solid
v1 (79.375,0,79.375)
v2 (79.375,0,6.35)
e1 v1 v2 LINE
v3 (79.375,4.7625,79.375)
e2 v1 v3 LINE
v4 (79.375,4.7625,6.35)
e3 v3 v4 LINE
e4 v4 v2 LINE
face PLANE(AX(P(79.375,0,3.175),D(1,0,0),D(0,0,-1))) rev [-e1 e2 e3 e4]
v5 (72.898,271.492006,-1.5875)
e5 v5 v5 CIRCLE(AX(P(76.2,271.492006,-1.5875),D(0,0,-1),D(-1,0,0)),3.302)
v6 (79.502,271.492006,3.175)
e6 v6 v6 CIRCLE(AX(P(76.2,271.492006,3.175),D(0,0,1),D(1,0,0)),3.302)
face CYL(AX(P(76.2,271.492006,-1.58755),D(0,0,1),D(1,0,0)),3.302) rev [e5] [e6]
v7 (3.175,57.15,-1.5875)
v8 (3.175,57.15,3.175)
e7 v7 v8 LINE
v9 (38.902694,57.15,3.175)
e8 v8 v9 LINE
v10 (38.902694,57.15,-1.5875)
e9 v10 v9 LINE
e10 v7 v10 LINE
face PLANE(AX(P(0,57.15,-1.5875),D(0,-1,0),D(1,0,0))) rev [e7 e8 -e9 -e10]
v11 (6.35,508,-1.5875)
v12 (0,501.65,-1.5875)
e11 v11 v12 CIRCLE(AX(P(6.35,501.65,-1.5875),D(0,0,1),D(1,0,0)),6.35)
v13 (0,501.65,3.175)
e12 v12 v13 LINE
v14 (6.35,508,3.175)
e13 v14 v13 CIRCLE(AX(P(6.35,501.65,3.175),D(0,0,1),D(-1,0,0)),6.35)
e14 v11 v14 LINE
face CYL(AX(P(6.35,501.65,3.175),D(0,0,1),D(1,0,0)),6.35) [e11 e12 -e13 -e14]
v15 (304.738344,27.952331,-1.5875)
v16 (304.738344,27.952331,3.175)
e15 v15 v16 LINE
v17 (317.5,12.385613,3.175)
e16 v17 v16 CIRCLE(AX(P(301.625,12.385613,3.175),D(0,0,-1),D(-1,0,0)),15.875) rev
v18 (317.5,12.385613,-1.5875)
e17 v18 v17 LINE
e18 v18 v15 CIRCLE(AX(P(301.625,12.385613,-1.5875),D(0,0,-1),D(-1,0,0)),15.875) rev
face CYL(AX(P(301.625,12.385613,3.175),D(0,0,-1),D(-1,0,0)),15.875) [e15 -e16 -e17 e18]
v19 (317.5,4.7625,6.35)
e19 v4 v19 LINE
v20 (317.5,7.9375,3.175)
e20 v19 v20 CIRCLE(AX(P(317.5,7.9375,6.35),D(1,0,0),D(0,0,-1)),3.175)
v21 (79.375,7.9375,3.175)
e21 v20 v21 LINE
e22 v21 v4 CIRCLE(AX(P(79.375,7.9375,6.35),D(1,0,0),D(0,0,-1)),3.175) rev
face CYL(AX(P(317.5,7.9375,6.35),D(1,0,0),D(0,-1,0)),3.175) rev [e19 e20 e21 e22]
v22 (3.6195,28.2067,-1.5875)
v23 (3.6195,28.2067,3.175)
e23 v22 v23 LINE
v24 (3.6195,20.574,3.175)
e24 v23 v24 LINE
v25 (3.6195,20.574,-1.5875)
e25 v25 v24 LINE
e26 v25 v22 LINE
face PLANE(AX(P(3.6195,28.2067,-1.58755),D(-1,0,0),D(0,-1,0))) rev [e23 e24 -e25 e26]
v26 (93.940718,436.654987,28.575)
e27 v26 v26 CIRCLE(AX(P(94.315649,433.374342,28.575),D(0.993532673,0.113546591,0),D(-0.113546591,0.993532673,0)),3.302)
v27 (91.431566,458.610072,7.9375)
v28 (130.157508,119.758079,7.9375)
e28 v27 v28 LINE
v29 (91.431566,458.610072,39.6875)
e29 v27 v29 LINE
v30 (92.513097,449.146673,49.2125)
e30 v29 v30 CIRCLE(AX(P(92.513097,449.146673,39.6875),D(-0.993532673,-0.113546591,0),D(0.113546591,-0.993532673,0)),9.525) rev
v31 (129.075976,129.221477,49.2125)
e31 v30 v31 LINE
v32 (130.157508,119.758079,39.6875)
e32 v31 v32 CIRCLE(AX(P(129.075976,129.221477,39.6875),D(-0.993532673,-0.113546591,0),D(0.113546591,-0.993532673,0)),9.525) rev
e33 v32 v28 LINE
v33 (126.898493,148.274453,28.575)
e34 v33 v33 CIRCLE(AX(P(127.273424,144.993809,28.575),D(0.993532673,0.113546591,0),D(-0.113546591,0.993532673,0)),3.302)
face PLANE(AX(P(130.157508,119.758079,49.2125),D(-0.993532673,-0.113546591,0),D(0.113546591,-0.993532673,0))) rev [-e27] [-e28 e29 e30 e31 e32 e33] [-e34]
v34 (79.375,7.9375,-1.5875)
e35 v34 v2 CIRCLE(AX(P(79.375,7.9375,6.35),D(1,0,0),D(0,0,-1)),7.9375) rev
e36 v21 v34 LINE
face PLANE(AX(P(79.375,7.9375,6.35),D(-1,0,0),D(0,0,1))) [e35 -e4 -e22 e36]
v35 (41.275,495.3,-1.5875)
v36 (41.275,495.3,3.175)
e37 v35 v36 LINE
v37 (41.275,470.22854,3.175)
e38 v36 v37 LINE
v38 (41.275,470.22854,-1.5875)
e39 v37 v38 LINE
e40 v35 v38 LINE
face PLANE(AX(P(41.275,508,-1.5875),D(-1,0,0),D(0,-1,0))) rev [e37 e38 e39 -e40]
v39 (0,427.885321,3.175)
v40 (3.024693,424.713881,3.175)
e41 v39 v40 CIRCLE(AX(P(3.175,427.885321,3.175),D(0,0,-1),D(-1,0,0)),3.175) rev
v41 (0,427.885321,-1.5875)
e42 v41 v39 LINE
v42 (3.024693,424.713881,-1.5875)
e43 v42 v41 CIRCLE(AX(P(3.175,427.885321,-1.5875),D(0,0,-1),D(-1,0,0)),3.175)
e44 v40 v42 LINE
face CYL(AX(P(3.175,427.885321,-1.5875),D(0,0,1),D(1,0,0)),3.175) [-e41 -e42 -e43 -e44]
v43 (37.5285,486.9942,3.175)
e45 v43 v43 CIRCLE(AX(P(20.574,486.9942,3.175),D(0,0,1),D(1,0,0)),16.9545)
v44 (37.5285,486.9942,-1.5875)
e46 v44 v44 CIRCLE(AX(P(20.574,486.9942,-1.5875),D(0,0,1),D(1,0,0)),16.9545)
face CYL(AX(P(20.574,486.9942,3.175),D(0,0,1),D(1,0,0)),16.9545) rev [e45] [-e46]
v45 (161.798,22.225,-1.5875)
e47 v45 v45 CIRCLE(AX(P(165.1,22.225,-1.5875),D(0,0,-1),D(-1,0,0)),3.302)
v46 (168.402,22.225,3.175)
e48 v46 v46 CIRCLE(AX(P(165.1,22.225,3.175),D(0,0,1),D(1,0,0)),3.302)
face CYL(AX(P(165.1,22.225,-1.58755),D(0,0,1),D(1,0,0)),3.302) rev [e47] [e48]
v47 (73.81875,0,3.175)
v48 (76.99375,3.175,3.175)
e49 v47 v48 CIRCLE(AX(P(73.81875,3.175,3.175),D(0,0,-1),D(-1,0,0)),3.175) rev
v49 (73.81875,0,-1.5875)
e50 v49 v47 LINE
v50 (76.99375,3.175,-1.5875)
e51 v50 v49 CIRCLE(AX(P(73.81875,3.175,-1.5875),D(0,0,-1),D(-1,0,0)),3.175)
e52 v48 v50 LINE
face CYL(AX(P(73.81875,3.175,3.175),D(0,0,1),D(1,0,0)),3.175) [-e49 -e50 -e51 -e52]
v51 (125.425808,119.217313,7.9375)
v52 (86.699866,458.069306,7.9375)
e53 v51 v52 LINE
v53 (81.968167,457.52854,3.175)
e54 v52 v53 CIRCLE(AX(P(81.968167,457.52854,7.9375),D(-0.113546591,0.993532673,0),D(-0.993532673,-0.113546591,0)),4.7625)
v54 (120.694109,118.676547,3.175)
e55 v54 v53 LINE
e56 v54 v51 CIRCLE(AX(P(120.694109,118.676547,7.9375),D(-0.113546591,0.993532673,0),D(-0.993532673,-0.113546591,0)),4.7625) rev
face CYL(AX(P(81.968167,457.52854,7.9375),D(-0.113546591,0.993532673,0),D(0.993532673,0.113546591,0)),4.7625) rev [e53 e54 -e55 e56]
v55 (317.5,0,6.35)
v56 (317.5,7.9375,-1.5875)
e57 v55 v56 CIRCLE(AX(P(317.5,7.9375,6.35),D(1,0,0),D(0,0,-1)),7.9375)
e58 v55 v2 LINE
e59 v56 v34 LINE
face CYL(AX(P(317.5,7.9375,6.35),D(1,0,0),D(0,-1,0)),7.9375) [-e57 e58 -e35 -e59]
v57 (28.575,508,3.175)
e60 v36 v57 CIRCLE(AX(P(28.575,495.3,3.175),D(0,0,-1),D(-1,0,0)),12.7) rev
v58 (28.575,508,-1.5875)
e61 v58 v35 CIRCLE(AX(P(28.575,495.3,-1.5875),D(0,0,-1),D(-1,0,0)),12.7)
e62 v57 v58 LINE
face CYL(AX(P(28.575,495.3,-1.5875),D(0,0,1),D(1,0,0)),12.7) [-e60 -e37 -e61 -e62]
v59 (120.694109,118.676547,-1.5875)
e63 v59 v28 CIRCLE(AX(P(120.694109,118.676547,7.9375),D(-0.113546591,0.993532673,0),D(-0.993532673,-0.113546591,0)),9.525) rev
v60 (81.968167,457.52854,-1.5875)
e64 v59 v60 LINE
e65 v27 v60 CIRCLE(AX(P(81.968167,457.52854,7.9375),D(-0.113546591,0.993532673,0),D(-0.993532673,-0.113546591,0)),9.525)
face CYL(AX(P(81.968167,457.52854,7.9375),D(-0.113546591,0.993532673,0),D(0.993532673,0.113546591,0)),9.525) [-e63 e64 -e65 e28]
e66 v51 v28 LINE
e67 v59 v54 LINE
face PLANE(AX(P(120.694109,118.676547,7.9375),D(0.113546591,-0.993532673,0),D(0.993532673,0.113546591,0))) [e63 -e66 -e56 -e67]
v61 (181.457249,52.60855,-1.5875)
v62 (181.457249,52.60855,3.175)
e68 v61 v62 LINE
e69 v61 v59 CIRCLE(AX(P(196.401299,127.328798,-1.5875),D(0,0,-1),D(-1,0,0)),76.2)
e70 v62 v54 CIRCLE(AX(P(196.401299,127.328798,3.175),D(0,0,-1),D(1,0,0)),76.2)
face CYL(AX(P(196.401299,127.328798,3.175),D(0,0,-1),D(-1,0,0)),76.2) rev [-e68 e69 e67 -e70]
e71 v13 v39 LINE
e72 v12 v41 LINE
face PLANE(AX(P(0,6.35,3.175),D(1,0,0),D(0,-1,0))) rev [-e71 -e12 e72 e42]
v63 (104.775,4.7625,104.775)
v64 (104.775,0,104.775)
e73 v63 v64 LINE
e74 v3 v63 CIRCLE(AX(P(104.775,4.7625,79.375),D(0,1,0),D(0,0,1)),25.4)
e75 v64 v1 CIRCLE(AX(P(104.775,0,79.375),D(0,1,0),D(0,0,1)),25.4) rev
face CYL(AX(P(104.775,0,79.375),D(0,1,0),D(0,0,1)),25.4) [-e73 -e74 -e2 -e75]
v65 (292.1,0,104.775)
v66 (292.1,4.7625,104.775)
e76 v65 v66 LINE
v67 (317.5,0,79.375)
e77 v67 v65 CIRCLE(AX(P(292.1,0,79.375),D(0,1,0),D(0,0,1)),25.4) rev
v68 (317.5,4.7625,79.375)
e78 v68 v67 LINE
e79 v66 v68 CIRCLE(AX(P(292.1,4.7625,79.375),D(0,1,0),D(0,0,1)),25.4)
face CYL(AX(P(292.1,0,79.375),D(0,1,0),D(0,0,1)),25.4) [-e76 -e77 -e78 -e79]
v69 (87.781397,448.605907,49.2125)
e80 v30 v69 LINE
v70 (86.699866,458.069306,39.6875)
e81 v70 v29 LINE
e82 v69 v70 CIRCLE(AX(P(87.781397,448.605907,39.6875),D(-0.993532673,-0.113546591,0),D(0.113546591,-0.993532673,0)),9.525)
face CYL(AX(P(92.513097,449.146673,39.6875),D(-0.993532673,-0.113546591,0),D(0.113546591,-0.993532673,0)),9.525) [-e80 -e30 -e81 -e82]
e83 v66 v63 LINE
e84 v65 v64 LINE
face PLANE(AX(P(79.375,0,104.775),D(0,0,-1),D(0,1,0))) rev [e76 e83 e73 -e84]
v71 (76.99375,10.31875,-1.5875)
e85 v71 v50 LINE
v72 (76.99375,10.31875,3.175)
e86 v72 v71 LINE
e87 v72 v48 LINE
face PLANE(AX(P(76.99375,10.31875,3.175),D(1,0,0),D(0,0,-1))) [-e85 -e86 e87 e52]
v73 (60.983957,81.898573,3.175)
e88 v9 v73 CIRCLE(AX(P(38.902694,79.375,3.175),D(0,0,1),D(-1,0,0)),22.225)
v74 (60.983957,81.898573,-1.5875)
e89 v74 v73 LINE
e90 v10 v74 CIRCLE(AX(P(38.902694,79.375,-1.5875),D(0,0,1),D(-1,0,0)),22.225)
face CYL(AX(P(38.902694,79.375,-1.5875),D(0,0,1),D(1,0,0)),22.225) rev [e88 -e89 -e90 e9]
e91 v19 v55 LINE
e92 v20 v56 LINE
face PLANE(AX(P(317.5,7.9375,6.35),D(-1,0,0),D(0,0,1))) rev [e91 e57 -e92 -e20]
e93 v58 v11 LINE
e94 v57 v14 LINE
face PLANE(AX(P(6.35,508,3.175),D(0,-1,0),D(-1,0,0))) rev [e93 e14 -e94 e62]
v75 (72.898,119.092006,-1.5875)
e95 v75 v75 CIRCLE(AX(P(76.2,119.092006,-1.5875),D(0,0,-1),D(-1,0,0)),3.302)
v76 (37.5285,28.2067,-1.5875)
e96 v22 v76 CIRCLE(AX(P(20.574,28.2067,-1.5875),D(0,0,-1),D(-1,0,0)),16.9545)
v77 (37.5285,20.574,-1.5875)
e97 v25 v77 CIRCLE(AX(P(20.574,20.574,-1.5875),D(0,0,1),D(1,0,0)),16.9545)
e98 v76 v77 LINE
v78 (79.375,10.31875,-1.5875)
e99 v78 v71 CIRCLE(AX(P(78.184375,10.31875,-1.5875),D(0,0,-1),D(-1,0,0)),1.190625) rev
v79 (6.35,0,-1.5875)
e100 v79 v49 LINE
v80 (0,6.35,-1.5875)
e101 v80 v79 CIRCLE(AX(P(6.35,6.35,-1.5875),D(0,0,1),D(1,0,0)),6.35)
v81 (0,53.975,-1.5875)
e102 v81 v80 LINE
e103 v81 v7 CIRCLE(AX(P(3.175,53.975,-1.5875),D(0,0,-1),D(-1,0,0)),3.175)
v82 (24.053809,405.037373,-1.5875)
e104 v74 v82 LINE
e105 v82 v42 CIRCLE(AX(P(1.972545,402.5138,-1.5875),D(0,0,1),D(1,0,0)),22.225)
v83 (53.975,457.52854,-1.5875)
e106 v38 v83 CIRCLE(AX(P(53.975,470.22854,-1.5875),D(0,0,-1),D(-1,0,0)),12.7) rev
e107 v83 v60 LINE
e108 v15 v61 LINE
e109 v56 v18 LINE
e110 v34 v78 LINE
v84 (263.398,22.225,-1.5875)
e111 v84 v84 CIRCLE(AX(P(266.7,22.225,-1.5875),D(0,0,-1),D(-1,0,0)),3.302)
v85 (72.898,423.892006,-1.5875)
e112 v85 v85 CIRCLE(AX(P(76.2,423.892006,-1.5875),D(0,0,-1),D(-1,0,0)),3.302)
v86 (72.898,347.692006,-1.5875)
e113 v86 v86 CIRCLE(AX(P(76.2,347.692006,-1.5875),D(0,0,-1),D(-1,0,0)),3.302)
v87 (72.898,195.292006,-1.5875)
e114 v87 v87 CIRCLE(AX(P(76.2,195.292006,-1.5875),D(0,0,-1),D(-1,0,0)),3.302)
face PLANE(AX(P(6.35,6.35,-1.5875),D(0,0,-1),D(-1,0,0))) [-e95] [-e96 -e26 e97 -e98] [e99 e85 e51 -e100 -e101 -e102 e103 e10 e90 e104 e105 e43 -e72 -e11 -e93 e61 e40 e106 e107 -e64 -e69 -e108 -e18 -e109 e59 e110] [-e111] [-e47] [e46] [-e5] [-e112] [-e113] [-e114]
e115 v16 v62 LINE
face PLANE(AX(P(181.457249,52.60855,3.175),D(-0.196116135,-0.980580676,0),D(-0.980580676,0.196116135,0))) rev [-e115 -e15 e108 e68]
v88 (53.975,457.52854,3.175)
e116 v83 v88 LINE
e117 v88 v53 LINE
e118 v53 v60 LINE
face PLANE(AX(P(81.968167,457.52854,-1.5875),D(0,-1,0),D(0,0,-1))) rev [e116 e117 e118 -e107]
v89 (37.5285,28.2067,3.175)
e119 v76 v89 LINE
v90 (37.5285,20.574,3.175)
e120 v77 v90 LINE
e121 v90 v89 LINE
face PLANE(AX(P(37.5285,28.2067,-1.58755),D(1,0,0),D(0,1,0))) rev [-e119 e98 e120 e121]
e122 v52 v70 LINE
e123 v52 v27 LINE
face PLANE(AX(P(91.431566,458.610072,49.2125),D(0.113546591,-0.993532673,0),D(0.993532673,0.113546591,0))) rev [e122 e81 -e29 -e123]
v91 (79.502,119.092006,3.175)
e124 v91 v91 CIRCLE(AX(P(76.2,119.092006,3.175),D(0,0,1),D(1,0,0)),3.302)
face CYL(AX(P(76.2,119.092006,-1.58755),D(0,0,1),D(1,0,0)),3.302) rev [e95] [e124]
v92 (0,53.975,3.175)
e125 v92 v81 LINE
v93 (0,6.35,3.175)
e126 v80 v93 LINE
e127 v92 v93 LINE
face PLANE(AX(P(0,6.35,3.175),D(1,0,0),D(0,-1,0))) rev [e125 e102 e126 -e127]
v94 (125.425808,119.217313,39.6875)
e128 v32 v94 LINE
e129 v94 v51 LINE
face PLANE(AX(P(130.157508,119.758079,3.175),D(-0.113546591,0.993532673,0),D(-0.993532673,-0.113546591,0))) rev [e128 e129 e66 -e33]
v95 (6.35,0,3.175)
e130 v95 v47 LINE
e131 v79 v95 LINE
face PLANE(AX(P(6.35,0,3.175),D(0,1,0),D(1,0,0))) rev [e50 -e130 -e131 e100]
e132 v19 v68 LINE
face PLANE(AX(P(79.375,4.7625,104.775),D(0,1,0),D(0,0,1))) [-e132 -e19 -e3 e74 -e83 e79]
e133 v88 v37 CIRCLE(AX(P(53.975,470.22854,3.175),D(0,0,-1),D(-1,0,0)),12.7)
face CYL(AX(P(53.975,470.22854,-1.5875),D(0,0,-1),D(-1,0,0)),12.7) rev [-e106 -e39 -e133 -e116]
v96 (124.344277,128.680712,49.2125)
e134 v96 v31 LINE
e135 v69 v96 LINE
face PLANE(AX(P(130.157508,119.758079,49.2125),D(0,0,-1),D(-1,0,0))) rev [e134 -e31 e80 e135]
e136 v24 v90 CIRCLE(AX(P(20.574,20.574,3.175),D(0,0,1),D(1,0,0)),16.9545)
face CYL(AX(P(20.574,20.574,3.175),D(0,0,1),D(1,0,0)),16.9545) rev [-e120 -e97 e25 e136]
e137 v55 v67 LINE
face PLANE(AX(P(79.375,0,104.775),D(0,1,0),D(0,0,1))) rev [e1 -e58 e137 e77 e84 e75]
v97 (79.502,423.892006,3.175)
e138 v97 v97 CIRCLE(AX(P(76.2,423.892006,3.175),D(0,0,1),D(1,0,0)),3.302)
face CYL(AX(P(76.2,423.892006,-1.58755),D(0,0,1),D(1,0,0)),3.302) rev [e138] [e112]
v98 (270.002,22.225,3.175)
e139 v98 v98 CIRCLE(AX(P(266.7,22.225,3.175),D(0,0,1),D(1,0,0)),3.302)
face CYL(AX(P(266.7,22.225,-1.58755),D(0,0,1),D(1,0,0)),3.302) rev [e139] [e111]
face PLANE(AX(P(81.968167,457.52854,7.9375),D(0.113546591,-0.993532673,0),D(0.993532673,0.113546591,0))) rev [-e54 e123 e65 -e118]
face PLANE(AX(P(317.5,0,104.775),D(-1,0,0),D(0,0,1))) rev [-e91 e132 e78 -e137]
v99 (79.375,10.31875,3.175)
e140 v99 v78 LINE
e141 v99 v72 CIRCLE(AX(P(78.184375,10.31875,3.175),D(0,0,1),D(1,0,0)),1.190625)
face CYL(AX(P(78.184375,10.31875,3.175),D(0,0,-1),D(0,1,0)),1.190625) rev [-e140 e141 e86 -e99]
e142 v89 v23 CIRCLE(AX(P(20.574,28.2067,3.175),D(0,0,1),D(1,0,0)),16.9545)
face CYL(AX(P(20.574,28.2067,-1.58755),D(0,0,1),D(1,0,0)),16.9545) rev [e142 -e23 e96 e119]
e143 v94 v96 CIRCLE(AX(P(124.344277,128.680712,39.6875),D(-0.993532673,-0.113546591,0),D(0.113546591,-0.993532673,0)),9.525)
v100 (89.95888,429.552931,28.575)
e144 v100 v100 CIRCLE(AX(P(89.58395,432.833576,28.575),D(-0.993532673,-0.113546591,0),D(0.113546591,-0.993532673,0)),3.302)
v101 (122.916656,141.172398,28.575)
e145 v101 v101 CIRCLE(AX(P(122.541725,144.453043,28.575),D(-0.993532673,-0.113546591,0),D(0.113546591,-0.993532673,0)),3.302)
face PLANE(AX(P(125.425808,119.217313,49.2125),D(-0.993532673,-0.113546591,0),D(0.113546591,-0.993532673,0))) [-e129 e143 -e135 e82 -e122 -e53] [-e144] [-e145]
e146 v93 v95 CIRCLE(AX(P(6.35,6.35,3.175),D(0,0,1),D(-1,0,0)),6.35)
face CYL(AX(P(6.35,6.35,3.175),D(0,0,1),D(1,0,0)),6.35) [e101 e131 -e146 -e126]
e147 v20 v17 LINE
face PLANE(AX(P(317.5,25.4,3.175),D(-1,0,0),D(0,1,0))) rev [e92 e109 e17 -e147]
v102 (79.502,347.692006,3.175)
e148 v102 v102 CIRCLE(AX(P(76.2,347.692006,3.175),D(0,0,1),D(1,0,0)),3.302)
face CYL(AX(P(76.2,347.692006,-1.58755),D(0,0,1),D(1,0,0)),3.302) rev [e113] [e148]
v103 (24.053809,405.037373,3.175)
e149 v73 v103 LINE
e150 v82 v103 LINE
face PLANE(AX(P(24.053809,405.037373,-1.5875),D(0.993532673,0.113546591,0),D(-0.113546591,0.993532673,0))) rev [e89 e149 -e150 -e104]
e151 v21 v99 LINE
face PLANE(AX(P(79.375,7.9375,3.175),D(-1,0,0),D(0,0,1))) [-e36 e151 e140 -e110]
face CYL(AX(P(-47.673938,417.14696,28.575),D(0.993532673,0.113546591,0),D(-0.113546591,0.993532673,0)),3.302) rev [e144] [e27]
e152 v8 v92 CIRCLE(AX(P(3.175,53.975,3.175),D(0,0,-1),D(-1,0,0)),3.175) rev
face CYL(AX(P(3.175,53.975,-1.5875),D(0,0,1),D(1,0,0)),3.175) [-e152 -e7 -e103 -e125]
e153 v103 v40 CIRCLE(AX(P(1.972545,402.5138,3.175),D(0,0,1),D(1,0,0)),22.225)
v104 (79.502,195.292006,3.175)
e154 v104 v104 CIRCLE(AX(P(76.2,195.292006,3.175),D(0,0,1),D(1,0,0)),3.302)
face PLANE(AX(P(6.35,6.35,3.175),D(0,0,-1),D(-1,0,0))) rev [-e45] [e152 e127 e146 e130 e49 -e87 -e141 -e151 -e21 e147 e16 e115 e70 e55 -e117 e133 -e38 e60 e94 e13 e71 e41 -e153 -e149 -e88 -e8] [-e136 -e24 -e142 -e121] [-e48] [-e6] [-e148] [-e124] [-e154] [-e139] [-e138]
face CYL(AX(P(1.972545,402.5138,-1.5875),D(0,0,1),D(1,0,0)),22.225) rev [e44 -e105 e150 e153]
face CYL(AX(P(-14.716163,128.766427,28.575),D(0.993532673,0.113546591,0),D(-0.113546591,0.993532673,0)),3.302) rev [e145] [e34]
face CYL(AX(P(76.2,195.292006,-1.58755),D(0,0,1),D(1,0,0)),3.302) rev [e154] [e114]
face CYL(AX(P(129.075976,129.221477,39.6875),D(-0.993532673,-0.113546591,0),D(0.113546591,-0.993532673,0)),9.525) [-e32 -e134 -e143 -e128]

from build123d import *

# Parameters (mm, degrees)
BOSS_EXTRUDE1_DEPTH      = 3.175
SKETCH2_R                = 16.9545
CUT_EXTRUDE1_DEPTH       = 600.06621556
FILLET1_R                = 15.875
CONVERT_SOLID1_START     = -1.5875
CONVERT_SOLID1_OUTLINE_R = 16.9545
CONVERT_SOLID1_DEPTH     = 1.5875
EDGE_FLANGE1_START       = 76.99375
EDGE_FLANGE1_DEPTH       = 240.50625
EDGE_FLANGE1_START_2     = 79.375
EDGE_FLANGE1_2_DEPTH     = 238.125
EDGE_FLANGE1_START_3     = -3
EDGE_FLANGE1_3_DEPTH     = 9.35
FILLET2_R                = 25.4
FILLET3_R                = 3.175
CUT_EXTRUDE2_DEPTH       = 4.7625
FILLET4_R                = 3.175
EDGE_FLANGE3_DEPTH       = 341.057724741
FILLET5_R                = 9.525
CUT_EXTRUDE3_DEPTH       = 4.7625
FILLET7_R                = 12.7
SKETCH17_R               = 3.302
CUT_EXTRUDE4_DEPTH       = 608.612384802
CUT_EXTRUDE5_DEPTH       = 608.612384802
SKETCH19_R               = 3.302
CUT_EXTRUDE6_DEPTH       = 533.561746786


with BuildPart() as part:
    # Sketch1 → Boss-Extrude1 (new body)
    with BuildSketch(Plane.XY):
        with BuildLine():
            Line((6.35, 0), (317.5, 0))
            Line((317.5, 0), (317.5, 25.4))
            Line((317.5, 25.4), (181.457249023, 52.608550195))
            ThreePointArc((181.457249023, 52.608550195), (140.315142877, 75.746018143), (120.694108864, 118.676547437))
            Line((120.694108864, 118.676547437), (76.2, 508))
            Line((76.2, 508), (6.35, 508))
            ThreePointArc((6.35, 508), (1.859871939, 506.140128061), (0, 501.65))
            Line((0, 501.65), (0, 6.35))
            ThreePointArc((0, 6.35), (1.859871939, 1.859871939), (6.35, 0))
        make_face()
    extrude(amount=BOSS_EXTRUDE1_DEPTH)

    # Sketch2 → Cut-Extrude1 (cut, through all)
    with BuildSketch(Plane.XY.offset(3.175)):
        with Locations((20.574, 486.9942)):
            Circle(SKETCH2_R)
        with Locations((20.574, 20.574)):
            Circle(SKETCH2_R)
    extrude(amount=-CUT_EXTRUDE1_DEPTH, mode=Mode.SUBTRACT)

    # Fillet1
    fillet1_edges = [part.edges().sort_by_distance(p)[0] for p in [
        (317.5, 25.4, 1.5875),
    ]]
    fillet(fillet1_edges, radius=FILLET1_R)

    # Convert-Solid1: read off the stored shape, not the designer's step
    # Convert-Solid1 outline → Convert-Solid1 (add)
    with BuildSketch(Plane.XY.offset(CONVERT_SOLID1_START)):
        with BuildLine():
            Line((304.738343645, 27.952331271), (181.457249023, 52.608550195))
            ThreePointArc((181.457249023, 52.608550195), (140.315142877, 75.746018143), (120.694108864, 118.676547437))
            Line((120.694108864, 118.676547437), (76.2, 508))
            Line((76.2, 508), (6.35, 508))
            ThreePointArc((6.35, 508), (1.859871939, 506.140128061), (0, 501.65))
            Line((0, 501.65), (0, 6.35))
            ThreePointArc((0, 6.35), (1.859871939, 1.859871939), (6.35, 0))
            Line((6.35, 0), (317.5, 0))
            Line((317.5, 0), (317.5, 12.385613044))
            ThreePointArc((317.5, 12.385613044), (313.901806494, 22.450186921), (304.738343645, 27.952331271))
        make_face()
        with Locations((20.574, 20.574)):
            Circle(CONVERT_SOLID1_OUTLINE_R, mode=Mode.SUBTRACT)
        with Locations((20.574, 486.9942)):
            Circle(CONVERT_SOLID1_OUTLINE_R, mode=Mode.SUBTRACT)
    extrude(amount=CONVERT_SOLID1_DEPTH)

    # Edge-Flange1: read off the stored shape, not the designer's step
    # Edge-Flange1 outline → Edge-Flange1 (cut)
    with BuildSketch(Plane.YZ.offset(EDGE_FLANGE1_START)):
        with BuildLine():
            ThreePointArc((7.9375, -1.5875), (3.589952199, -0.290988961), (0.662661084, 3.175))
            Line((0.662661084, 3.175), (0, 3.175))
            Line((0, 3.175), (0, -1.5875))
            Line((0, -1.5875), (7.9375, -1.5875))
        make_face()
    extrude(amount=EDGE_FLANGE1_DEPTH, mode=Mode.SUBTRACT)

    # Edge-Flange1 2 outline → Edge-Flange1 2 (add)
    with BuildSketch(Plane.YZ.offset(EDGE_FLANGE1_START_2)):
        with BuildLine():
            Line((0, 104.775), (0, 6.35))
            ThreePointArc((0, 6.35), (0.167431141, 4.728292203), (0.662661084, 3.175))
            Line((0.662661084, 3.175), (7.9375, 3.175))
            ThreePointArc((7.9375, 3.175), (5.69243597, 4.10493597), (4.7625, 6.35))
            Line((4.7625, 6.35), (4.7625, 104.775))
            Line((4.7625, 104.775), (0, 104.775))
        make_face()
    extrude(amount=EDGE_FLANGE1_2_DEPTH)

    # Edge-Flange1 3 outline → Edge-Flange1 3 (cut)
    with BuildSketch(Plane.XY.offset(EDGE_FLANGE1_START_3)):
        with BuildLine():
            Line((79.375, -1), (79.375, 10.31875))
            ThreePointArc((79.375, 10.31875), (78.184375, 11.509375), (76.99375, 10.31875))
            Line((76.99375, 10.31875), (76.99375, -1))
            Line((76.99375, -1), (79.375, -1))
        make_face()
    extrude(amount=EDGE_FLANGE1_3_DEPTH, mode=Mode.SUBTRACT)

    # Fillet2
    fillet2_edges = [part.edges().sort_by_distance(p)[0] for p in [
        (79.375, 2.38125, 104.775),
        (317.5, 2.38125, 104.775),
    ]]
    fillet(fillet2_edges, radius=FILLET2_R)

    # Fillet3
    fillet3_edges = [part.edges().sort_by_distance(p)[0] for p in [
        (76.99375, 0, 0.79375),
    ]]
    fillet(fillet3_edges, radius=FILLET3_R)

    # Sketch7 → Cut-Extrude2 (cut)
    with BuildSketch(Plane.XY.offset(3.175)):
        with BuildLine():
            Line((24.053808826, 405.037372989), (60.983957397, 81.898572989))
            ThreePointArc((60.983957397, 81.898572989), (55.486376009, 64.57864546), (38.902693748, 57.15))
            Line((38.902693748, 57.15), (0, 57.15))
            Line((0, 57.15), (0, 424.7388))
            Line((0, 424.7388), (1.972545176, 424.7388))
            ThreePointArc((1.972545176, 424.7388), (16.768899716, 419.097482261), (24.053808826, 405.037372989))
        make_face()
    extrude(amount=-CUT_EXTRUDE2_DEPTH, mode=Mode.SUBTRACT)

    # Fillet4
    fillet4_edges = [part.edges().sort_by_distance(p)[0] for p in [
        (0, 424.7388, 0.79375),
        (0, 57.15, 0.79375),
    ]]
    fillet(fillet4_edges, radius=FILLET4_R)

    # Edge-Flange3: sheet metal written as solids
    # Edge-Flange3 section (on a plane across the edge) → Edge-Flange3 (add)
    with BuildSketch(Plane(origin=(125.425808218, 119.217313077, 3.175), x_dir=(-0.9935326726564042, -0.11354659116073179, 3.4914813388431334e-15), z_dir=(-0.11354659116073179, 0.9935326726564042, 0))):
        with BuildLine():
            Line((-4.7625, 4.7625), (-4.7625, 46.0375))
            Line((-4.7625, 46.0375), (0, 46.0375))
            Line((0, 46.0375), (0, 4.7625))
            ThreePointArc((0, 4.7625), (1.394903955, 1.394903955), (4.7625, 0))
            Line((4.7625, 0), (4.7625, -4.7625))
            ThreePointArc((4.7625, -4.7625), (-1.972692091, -1.972692091), (-4.7625, 4.7625))
        make_face()
    extrude(amount=EDGE_FLANGE3_DEPTH)

    # Fillet5
    fillet5_edges = [part.edges().sort_by_distance(p)[0] for p in [
        (127.791657895, 119.487695897, 49.2125),
        (89.065715861, 458.33968869, 49.2125),
    ]]
    fillet(fillet5_edges, radius=FILLET5_R)

    # Sketch16 → Cut-Extrude3 (cut)
    with BuildSketch(Plane.XY.offset(3.175)):
        Polygon((76.2, 508), (41.275, 508), (41.275, 457.528540229), (81.968166831, 457.528540229), align=None)
    extrude(amount=-CUT_EXTRUDE3_DEPTH, mode=Mode.SUBTRACT)

    # Fillet7
    fillet7_edges = [part.edges().sort_by_distance(p)[0] for p in [
        (41.275, 457.528540229, 0.79375),
        (41.275, 508, 0.79375),
    ]]
    fillet(fillet7_edges, radius=FILLET7_R)

    # Sketch17 → Cut-Extrude4 (cut, through all)
    with BuildSketch(Plane.XY.offset(3.175)):
        with Locations((76.2, 423.892006342)):
            Circle(SKETCH17_R)
        with Locations((76.2, 347.692006342)):
            Circle(SKETCH17_R)
        with Locations((76.2, 271.492006342)):
            Circle(SKETCH17_R)
        with Locations((76.2, 195.292006342)):
            Circle(SKETCH17_R)
        with Locations((76.2, 119.092006342)):
            Circle(SKETCH17_R)
        with Locations((266.7, 22.225)):
            Circle(SKETCH17_R)
        with Locations((165.1, 22.225)):
            Circle(SKETCH17_R)
    extrude(amount=-CUT_EXTRUDE4_DEPTH, mode=Mode.SUBTRACT)

    # Sketch18 → Cut-Extrude5 (cut, through all)
    with BuildSketch(Plane.XY.offset(3.175)):
        with BuildLine():
            Line((3.6195, 28.2067), (3.6195, 20.574))
            ThreePointArc((3.6195, 20.574), (20.574, 3.6195), (37.5285, 20.574))
            Line((37.5285, 20.574), (37.5285, 28.2067))
            ThreePointArc((37.5285, 28.2067), (20.574, 45.1612), (3.6195, 28.2067))
        make_face()
    extrude(amount=-CUT_EXTRUDE5_DEPTH, mode=Mode.SUBTRACT)

    # Sketch19 → Cut-Extrude6 (cut, through all)
    with BuildSketch(Plane(origin=(141.989587265, 16.227381402, 0), x_dir=(0, 0, -1), z_dir=(0.9935326726564043, 0.1135465911607318, -3.62817709114321e-15))):
        with Locations(Location((-28.575, 419.862347463, 0), (0, 0, 90))):
            Circle(SKETCH19_R)
        with Locations(Location((-28.575, 129.604622722, 0), (0, 0, 90))):
            Circle(SKETCH19_R)
    extrude(amount=-CUT_EXTRUDE6_DEPTH, mode=Mode.SUBTRACT)


solid = part.part
